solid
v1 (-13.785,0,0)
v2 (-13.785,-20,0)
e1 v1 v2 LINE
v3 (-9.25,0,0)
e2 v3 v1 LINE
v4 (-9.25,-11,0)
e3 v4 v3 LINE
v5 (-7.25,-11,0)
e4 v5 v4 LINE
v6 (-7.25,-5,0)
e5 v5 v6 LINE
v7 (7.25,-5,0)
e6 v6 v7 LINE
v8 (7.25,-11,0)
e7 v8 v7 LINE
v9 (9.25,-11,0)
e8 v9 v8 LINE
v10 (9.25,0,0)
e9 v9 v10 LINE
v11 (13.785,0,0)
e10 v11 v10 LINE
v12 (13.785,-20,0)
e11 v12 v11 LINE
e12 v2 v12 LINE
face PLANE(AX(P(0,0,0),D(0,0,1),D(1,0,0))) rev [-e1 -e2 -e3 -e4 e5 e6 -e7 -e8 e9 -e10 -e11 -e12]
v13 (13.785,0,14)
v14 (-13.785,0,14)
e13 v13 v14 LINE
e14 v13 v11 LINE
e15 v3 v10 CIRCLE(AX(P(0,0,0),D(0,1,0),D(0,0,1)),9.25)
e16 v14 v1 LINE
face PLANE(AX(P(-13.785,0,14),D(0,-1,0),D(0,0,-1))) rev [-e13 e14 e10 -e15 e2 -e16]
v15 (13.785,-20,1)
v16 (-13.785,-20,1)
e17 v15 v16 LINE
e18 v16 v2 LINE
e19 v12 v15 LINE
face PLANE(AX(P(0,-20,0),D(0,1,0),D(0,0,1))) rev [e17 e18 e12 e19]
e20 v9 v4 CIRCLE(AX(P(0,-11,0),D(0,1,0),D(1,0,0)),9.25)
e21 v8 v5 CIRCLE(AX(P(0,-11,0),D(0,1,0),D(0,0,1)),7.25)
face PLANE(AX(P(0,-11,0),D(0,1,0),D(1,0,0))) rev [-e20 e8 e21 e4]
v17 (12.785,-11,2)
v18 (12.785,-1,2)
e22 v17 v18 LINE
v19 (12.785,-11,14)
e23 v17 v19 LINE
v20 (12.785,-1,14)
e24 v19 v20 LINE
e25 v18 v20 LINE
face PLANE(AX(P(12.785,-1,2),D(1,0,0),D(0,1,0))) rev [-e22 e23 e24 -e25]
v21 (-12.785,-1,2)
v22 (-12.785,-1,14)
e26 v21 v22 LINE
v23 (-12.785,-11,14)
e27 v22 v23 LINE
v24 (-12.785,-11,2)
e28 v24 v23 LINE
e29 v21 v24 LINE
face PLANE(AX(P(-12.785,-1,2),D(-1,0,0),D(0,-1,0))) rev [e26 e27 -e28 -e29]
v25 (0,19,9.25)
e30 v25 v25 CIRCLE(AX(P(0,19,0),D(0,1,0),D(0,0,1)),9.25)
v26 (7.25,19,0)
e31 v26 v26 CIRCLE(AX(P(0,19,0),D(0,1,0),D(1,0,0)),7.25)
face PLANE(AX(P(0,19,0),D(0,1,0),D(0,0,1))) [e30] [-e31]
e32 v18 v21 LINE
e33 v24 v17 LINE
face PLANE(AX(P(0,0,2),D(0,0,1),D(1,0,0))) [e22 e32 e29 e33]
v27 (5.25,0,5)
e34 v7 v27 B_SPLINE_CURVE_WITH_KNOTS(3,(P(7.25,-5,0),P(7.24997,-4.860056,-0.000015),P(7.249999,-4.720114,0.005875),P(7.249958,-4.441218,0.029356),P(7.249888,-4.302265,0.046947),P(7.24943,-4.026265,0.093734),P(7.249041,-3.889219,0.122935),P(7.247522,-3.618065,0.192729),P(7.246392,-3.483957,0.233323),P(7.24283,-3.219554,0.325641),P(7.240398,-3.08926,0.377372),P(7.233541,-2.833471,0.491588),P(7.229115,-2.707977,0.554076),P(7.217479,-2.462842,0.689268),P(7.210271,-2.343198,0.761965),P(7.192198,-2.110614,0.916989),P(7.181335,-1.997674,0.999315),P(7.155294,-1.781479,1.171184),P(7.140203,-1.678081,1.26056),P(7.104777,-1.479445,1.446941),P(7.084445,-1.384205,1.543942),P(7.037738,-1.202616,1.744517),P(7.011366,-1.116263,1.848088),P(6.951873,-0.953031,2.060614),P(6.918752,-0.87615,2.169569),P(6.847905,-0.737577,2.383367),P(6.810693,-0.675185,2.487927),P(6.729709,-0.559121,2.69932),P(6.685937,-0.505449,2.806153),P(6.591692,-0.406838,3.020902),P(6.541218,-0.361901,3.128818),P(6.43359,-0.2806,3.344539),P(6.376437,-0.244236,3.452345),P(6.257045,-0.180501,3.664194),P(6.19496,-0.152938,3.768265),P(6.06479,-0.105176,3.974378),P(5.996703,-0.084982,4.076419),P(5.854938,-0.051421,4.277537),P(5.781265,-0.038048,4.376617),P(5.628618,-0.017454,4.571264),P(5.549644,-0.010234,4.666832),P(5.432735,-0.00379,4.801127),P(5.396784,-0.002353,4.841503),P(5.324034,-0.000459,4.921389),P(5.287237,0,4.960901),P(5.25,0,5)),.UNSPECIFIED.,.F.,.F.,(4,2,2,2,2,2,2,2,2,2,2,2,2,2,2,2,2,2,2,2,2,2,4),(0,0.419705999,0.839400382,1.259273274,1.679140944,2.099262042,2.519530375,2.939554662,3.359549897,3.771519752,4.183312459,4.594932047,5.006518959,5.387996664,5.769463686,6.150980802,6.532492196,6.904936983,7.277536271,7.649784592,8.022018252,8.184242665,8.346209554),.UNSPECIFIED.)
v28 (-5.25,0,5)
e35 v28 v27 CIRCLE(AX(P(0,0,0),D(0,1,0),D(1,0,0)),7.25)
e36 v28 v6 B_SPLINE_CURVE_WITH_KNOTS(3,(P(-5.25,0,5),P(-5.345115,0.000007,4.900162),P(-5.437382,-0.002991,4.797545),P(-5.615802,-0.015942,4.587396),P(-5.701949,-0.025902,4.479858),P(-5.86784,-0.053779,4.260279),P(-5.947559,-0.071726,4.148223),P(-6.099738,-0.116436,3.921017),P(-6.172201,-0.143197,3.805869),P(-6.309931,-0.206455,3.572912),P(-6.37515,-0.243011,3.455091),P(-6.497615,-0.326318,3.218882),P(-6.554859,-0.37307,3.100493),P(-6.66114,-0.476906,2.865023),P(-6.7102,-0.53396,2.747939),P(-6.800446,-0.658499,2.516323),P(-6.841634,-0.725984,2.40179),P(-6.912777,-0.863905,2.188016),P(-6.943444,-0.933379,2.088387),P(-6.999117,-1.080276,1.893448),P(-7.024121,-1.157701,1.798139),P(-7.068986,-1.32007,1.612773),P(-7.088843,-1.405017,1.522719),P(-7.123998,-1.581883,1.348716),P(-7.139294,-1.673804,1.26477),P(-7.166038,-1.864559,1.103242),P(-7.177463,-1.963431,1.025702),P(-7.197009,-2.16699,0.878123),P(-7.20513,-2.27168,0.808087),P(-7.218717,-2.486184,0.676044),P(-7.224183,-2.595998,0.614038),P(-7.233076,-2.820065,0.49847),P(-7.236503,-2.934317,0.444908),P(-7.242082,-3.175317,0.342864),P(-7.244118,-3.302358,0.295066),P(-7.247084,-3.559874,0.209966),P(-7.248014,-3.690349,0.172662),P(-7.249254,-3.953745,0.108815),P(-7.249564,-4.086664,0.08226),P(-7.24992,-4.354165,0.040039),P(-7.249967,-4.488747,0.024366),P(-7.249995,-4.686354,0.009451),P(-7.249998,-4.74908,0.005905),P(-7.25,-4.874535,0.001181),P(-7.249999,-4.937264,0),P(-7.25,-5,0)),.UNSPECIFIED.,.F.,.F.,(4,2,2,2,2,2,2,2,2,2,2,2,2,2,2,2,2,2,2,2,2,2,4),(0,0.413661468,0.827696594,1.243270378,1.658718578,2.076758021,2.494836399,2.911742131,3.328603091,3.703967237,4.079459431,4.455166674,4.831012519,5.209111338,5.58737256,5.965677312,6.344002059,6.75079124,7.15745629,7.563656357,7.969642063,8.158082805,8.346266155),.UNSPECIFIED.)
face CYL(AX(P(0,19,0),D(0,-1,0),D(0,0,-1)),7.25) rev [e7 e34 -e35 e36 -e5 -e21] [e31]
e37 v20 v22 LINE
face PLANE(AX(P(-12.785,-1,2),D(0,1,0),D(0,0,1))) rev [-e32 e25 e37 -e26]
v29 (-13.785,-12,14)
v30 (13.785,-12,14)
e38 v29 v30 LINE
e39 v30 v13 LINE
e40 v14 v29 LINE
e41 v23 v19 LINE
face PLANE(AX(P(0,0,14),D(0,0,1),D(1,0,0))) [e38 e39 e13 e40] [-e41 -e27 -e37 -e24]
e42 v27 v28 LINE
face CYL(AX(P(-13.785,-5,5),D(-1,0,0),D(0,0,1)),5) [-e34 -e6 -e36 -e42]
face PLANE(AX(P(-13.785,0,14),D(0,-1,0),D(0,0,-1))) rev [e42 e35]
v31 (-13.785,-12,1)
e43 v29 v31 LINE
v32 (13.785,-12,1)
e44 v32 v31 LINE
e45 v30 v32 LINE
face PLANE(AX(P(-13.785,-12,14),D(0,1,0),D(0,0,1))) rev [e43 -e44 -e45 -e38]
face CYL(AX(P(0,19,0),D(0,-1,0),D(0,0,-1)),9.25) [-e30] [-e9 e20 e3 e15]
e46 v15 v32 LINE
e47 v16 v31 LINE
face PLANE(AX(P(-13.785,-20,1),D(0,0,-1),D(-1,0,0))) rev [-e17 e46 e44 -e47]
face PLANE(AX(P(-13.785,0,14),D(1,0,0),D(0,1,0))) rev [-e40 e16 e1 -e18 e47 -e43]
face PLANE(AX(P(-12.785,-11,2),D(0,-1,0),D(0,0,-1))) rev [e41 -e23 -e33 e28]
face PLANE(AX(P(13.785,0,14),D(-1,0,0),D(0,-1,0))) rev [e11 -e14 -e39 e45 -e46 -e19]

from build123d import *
from build123d.topology import SkipClean

# Parameters (mm, degrees)
SKETCH_2_R          = 9.25
SKETCH_2_R_2        = 7.25
F_19MM_DEPTH        = 19
EXTRUDE_START       = -11
EXTRUDE_7_DEPTH     = 11
SKETCH_630_W        = 27.57
SKETCH_630_H        = 12
EXTRUDE_682_DEPTH   = 14
SKETCH_6_W          = 25.57
SKETCH_6_H          = 10
CUT_EXTRUDE_1_DEPTH = 12
FILLET_1_R          = 5
SKETCH_10_W         = 27.57
SKETCH_10_H         = 1
EXTRUDE_3_DEPTH     = 8


with BuildPart() as part:
    # 草圖2 → 19mm (new body)
    with BuildSketch(Plane(origin=(0, 0, 0), x_dir=(1, 0, 0), z_dir=(0, 1, 0))):
        Circle(SKETCH_2_R)
        Circle(SKETCH_2_R_2, mode=Mode.SUBTRACT)
    extrude(amount=F_19MM_DEPTH)

    # 草圖14 → 伸長-薄件7 (add)
    with SkipClean():  # the faces are left unmerged after this step: merging them gives an invalid solid
        with BuildSketch(Plane(origin=(0, 0, 0), x_dir=(1, 0, 0), z_dir=(0, 1, 0)).offset(EXTRUDE_START)):
            with BuildLine():
                ThreePointArc((7.25, 0), (0, 7.25), (-7.25, 0))
                Line((-7.25, 0), (-9.25, 0))
                ThreePointArc((-9.25, 0), (0, 9.25), (9.25, 0))
                Line((9.25, 0), (7.25, 0))
            make_face()
        extrude(amount=EXTRUDE_7_DEPTH)

    # Sketch 630 → Extrude 682 (add)
    with SkipClean():  # the faces are left unmerged after this step: merging them gives an invalid solid
        with BuildSketch(Plane.XY):
            with Locations((0, -6)):
                Rectangle(SKETCH_630_W, SKETCH_630_H)
        extrude(amount=EXTRUDE_682_DEPTH)

    # 草圖6 → 除料-伸長1 (cut)
    with SkipClean():  # the faces are left unmerged after this step: merging them gives an invalid solid
        with BuildSketch(Plane.XY.offset(14)):
            with Locations((0, -6)):
                Rectangle(SKETCH_6_W, SKETCH_6_H)
        extrude(amount=-CUT_EXTRUDE_1_DEPTH, mode=Mode.SUBTRACT)

    # 圓角1
    # the kernel refuses this fillet: 5 mm, written as the material it takes off along each edge
    with BuildSketch(Plane(origin=(-19.75, 0, 0), x_dir=(0, -1, 0), z_dir=(1, 0, 0))) as fillet_1_piece_1_section:
        with BuildLine():
            CenterArc((FILLET_1_R, -FILLET_1_R), FILLET_1_R, 90, 90)
            Line((0, -FILLET_1_R), (0, 0))
            Line((0, 0), (FILLET_1_R, 0))
        make_face()
    fillet_1_piece_1 = extrude(amount=39.5, mode=Mode.PRIVATE)
    fillet_1_piece_1 = fillet_1_piece_1 & Plane(origin=(0, -1.958227167, 0), x_dir=(1, 0, 0), z_dir=(0, -1, 0)) * Cylinder(7.25, 99, mode=Mode.PRIVATE)
    add(fillet_1_piece_1, mode=Mode.SUBTRACT)

    # 草圖10 → 填料-伸長3 (add)
    with BuildSketch(Plane.XZ.offset(12)):
        with Locations((0, 0.5)):
            Rectangle(SKETCH_10_W, SKETCH_10_H)
    extrude(amount=EXTRUDE_3_DEPTH)


solid = part.part
